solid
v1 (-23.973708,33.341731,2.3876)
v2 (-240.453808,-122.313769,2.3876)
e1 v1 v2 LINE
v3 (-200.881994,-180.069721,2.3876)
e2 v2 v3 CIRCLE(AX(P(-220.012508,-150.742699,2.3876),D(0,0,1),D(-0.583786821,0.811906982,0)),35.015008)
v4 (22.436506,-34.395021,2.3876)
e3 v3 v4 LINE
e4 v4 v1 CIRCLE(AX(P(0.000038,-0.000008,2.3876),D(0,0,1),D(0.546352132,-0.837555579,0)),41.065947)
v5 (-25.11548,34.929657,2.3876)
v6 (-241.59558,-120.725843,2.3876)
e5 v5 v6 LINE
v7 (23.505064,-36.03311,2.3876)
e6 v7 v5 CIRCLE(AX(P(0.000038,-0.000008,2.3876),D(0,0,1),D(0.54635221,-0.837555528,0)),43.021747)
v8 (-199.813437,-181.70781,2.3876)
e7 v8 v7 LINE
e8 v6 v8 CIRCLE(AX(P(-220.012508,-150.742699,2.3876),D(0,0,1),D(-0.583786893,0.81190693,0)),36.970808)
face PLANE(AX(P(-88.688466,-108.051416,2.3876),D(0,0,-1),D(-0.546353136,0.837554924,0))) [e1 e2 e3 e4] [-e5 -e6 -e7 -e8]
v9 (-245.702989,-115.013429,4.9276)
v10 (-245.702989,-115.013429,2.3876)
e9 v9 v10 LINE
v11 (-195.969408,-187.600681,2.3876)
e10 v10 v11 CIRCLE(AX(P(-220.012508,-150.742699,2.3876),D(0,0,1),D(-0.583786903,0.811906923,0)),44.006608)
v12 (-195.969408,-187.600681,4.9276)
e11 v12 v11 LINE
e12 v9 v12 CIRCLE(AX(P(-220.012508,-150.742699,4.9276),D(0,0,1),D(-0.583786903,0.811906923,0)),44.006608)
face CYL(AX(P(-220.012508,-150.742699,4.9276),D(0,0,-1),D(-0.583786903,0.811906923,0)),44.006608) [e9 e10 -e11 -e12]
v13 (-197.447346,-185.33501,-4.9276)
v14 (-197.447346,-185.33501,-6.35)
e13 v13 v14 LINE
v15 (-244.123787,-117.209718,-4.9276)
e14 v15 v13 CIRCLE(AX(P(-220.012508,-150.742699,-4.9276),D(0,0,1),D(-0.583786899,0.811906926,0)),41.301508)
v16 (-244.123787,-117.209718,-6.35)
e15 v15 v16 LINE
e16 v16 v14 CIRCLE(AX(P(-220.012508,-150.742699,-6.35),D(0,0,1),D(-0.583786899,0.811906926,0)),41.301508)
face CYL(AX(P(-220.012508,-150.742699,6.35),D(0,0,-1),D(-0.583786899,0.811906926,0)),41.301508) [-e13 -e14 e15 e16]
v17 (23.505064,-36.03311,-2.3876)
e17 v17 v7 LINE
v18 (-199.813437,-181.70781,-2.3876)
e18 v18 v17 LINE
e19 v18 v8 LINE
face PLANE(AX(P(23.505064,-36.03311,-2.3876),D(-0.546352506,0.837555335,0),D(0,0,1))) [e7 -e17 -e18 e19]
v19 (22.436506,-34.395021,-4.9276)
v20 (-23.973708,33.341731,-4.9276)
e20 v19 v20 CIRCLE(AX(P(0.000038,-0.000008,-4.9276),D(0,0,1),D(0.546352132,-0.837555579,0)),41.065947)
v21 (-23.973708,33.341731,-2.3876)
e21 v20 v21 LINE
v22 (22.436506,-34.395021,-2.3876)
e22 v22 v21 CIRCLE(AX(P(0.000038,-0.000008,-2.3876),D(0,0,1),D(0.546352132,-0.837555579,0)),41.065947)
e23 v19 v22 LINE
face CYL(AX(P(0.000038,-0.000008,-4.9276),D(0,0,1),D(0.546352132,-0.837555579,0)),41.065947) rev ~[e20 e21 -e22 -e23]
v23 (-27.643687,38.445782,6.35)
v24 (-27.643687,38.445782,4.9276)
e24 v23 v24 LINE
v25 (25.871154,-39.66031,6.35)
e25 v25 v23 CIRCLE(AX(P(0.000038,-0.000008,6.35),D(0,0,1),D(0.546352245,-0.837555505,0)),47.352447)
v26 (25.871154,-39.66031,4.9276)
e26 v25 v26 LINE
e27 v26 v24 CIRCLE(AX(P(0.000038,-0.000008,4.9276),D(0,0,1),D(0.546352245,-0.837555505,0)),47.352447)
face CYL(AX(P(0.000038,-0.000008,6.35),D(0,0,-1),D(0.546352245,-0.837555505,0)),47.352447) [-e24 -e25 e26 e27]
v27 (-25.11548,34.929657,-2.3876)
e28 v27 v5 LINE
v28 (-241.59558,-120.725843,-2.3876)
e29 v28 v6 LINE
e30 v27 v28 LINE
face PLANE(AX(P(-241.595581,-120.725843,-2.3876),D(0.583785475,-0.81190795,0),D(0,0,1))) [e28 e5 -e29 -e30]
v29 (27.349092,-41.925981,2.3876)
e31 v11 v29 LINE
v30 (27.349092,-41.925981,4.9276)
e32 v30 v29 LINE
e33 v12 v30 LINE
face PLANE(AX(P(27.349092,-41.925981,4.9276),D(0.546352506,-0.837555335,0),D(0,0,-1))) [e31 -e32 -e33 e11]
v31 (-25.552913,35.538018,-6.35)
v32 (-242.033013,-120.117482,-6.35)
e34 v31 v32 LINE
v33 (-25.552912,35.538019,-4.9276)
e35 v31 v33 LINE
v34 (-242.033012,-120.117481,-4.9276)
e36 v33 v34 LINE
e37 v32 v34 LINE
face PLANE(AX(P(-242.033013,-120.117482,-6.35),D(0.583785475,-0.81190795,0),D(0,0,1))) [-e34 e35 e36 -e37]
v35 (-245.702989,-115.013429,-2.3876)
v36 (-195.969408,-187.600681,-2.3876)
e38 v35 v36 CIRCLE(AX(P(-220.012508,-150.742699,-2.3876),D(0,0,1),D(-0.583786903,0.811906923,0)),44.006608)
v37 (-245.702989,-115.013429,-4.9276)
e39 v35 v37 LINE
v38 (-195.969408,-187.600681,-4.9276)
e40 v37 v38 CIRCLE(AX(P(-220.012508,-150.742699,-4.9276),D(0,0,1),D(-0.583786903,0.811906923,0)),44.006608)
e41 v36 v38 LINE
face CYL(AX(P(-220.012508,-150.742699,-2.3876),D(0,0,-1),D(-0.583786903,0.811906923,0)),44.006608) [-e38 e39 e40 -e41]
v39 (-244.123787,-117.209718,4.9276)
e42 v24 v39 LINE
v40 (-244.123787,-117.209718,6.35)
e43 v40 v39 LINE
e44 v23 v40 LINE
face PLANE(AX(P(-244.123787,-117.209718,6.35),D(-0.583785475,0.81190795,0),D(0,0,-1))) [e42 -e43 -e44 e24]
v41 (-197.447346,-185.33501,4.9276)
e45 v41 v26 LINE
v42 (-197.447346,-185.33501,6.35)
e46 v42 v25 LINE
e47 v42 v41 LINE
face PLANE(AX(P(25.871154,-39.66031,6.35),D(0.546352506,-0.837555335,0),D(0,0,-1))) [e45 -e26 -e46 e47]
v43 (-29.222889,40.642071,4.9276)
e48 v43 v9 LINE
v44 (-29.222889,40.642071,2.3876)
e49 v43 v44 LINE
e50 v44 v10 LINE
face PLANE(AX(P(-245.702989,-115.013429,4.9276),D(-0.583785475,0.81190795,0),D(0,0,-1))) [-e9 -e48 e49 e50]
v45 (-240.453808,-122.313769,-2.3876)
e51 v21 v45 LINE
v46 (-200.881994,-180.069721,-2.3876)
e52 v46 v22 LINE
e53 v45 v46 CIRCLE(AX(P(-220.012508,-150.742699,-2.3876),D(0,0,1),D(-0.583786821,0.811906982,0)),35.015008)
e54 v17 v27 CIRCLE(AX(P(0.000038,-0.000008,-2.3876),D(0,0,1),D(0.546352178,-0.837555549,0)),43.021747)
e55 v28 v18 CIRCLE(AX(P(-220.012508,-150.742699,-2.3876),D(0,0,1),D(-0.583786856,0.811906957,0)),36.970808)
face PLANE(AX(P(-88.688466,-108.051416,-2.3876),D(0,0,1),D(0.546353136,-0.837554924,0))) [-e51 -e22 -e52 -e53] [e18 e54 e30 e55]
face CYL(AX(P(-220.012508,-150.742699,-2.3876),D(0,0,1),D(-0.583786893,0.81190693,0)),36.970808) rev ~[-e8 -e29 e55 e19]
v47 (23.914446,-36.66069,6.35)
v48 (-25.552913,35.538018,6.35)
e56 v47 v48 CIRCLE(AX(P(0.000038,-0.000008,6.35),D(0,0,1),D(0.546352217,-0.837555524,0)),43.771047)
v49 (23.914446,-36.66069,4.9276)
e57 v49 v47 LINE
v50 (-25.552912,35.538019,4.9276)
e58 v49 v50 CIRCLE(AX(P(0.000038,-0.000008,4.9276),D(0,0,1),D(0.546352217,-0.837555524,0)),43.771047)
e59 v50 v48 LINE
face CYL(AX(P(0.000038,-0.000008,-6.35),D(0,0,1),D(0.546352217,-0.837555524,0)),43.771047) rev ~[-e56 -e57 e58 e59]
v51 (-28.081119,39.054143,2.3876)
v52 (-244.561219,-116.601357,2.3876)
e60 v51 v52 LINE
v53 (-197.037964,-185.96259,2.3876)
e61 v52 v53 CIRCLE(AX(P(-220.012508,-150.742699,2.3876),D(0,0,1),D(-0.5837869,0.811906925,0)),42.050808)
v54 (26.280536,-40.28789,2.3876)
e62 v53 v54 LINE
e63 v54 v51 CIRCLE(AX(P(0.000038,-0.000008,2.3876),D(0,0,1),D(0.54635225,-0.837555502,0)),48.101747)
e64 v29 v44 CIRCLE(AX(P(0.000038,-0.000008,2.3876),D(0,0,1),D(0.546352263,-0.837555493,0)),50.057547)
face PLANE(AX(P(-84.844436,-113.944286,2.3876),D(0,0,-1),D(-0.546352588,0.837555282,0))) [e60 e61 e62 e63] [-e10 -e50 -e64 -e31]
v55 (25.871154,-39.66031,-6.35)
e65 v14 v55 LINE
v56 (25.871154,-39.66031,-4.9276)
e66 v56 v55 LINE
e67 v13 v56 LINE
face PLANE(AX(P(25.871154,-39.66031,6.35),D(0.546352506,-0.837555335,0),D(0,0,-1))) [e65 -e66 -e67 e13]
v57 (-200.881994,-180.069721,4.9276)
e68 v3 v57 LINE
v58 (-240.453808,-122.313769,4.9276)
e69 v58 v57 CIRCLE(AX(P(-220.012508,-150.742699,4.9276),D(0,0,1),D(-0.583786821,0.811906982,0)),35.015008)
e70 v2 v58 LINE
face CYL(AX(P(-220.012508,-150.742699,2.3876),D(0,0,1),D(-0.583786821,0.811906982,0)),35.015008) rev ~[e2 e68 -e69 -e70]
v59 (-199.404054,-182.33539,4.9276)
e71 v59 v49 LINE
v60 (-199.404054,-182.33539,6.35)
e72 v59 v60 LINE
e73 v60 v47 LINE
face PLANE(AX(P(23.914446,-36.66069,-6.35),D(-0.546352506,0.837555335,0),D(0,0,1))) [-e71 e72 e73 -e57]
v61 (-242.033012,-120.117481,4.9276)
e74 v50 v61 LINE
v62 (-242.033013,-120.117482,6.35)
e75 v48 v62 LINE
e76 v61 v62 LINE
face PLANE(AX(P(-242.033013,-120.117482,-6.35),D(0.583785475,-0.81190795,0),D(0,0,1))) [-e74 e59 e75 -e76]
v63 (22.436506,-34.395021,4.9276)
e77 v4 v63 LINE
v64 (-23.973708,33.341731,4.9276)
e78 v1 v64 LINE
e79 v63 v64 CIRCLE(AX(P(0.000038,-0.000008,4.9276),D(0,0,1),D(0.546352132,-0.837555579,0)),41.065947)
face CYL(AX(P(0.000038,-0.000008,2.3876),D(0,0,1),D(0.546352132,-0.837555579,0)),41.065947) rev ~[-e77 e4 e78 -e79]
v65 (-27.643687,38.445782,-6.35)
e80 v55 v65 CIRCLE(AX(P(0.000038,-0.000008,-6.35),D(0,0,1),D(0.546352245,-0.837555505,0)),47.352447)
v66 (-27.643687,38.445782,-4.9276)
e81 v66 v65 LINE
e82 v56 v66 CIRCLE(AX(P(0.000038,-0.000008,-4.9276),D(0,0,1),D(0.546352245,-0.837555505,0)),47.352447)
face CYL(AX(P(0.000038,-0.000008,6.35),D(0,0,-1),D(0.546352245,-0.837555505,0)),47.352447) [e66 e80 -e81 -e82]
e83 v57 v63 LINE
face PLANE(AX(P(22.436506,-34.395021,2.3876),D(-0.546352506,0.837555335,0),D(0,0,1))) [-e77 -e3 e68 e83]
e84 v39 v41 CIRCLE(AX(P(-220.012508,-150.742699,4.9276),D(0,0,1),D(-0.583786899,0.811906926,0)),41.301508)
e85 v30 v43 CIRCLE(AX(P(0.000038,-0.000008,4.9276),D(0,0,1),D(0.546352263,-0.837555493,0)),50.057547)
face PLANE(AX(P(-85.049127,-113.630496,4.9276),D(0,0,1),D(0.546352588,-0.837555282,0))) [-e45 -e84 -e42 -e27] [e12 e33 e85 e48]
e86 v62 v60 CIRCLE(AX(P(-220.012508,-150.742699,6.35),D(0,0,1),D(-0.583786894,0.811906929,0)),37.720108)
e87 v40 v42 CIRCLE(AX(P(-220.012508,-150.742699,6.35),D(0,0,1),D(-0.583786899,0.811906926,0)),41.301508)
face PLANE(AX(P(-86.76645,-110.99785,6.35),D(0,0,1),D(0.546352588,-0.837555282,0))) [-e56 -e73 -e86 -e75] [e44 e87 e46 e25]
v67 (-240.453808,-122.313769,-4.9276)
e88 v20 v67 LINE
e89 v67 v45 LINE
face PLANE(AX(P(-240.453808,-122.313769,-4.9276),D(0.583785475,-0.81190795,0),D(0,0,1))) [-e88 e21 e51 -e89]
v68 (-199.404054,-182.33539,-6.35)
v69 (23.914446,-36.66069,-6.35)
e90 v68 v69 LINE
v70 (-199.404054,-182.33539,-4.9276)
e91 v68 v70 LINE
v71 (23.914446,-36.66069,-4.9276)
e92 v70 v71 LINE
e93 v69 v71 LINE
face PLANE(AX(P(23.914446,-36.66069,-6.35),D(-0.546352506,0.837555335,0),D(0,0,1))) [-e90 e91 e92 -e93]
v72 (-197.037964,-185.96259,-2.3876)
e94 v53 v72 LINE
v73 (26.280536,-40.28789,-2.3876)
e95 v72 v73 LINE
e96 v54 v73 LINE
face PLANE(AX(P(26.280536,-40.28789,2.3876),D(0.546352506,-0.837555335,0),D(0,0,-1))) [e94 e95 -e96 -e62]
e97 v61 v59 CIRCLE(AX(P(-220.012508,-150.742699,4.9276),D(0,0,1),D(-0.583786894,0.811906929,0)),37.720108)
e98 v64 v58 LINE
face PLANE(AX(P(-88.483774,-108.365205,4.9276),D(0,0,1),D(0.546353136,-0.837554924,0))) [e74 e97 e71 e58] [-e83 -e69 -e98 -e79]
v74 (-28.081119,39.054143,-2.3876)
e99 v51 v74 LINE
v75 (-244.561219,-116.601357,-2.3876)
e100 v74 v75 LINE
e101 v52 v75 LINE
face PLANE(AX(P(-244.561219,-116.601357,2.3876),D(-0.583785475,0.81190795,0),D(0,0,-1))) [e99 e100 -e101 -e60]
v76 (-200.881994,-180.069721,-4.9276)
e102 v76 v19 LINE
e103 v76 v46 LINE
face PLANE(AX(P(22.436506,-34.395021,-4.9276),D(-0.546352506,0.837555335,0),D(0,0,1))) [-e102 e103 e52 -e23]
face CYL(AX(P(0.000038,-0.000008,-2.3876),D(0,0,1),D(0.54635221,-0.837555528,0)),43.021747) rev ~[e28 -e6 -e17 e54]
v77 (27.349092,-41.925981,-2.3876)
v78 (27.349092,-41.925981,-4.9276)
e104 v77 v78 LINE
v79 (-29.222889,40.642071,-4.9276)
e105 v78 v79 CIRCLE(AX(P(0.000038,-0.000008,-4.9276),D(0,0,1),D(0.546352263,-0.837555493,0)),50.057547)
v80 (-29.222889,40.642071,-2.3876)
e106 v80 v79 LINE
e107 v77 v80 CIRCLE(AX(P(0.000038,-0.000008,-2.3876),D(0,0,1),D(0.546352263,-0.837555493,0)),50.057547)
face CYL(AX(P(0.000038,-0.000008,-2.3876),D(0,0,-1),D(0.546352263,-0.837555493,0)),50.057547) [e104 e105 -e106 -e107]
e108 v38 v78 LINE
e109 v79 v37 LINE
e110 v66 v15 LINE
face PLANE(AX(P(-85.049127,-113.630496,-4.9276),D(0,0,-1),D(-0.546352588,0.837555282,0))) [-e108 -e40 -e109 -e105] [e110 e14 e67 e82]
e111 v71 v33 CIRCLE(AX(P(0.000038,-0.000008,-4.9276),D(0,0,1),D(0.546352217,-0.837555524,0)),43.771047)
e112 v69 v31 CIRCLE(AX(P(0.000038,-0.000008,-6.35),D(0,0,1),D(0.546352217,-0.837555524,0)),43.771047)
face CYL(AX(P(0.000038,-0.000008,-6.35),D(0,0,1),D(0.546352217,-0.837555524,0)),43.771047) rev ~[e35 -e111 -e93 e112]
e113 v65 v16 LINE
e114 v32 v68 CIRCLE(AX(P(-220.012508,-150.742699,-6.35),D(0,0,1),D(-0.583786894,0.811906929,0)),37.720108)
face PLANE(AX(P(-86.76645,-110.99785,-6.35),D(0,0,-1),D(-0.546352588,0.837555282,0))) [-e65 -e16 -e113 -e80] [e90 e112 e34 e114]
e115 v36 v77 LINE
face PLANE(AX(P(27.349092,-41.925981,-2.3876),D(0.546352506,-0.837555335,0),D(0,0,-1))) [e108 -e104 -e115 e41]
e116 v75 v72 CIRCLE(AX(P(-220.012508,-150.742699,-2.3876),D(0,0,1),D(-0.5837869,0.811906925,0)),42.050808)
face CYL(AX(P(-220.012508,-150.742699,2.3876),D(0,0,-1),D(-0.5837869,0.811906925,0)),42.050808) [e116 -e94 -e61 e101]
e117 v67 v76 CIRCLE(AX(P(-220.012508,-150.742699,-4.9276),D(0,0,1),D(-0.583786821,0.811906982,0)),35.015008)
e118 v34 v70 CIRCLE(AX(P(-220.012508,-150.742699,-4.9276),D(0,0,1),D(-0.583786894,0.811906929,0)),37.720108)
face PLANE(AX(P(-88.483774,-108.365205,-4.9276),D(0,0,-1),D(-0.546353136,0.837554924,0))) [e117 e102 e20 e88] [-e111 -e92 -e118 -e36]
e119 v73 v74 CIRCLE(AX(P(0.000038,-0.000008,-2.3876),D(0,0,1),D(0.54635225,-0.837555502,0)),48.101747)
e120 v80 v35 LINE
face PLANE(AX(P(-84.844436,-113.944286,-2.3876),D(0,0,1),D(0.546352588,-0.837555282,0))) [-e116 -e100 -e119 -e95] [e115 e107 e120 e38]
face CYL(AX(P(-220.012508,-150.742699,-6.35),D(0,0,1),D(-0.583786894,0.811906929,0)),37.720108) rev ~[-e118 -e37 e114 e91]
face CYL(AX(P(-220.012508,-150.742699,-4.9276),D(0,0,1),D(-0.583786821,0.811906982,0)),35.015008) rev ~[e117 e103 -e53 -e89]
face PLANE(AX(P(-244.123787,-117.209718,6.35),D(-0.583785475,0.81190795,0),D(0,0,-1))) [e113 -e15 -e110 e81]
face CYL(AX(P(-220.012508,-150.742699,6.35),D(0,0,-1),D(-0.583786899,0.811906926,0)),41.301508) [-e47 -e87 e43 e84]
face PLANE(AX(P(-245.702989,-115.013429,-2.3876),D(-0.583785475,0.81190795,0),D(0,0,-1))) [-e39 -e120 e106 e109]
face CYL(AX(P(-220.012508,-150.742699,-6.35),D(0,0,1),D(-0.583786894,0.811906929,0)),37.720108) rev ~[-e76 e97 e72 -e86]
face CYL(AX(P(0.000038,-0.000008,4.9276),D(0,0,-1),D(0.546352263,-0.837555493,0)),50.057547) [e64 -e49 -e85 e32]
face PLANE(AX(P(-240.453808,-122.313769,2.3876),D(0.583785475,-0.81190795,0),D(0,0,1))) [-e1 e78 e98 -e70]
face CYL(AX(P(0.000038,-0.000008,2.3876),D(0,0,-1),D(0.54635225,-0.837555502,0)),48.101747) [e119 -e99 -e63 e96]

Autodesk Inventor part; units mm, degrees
ref_plane "Work Plane2" through (-220.0125, -150.7427, 0) normal (-1, 0, 0) x (0, 0, 1)
ref_plane "Work Plane3" through (0, 0, 0) normal (-0.8772708, -0.4799957, 0) x (0, 0, 1)
sketch "Path" plane through (0, 0, 0) normal (0, 0, 1) x (1, 0, 0)
  arc A0 (-243.0784, -118.6636) -> (-198.4257, -183.8352) centre (-220.0125, -150.7427) ccw
  arc A1 (24.8928, -38.1605) -> (-26.5983, 36.9919) centre (0, 0) ccw
  line L0 (24.8928, -38.1605) -> (-198.4257, -183.8352)
  line L1 (-243.0784, -118.6636) -> (-26.5983, 36.9919)
  dimension "d31" = 8.9916
ref_plane "Section Plane" through (-198.4257, -183.8352, 0) normal (0.8375553, 0.5463526, 0) x (0, 0, 1)
sketch "Section Sketch" plane through (-198.4257, -183.8352, 0) normal (0.8375553, 0.5463526, 0) x (0, 0, 1)
  line L0 (-6.35, -1.7907) -> (6.35, -1.7907)
  line L1 (6.35, -1.7907) -> (6.35, 1.7907)
  line L2 (6.35, 1.7907) -> (-6.35, 1.7907)
  line L3 (-6.35, 1.7907) -> (-6.35, -1.7907)
  line L4 (-2.3876, -2.54) -> (2.3876, -2.54)
  line L5 (2.3876, -2.54) -> (2.3876, 2.54)
  line L6 (2.3876, 2.54) -> (-2.3876, 2.54)
  line L7 (-2.3876, 2.54) -> (-2.3876, -2.54)
  line L8 (-2.3876, 0) -> (2.3876, 0) construction
  line L9 (-4.9276, -4.4958) -> (-2.3876, -4.4958)
  line L10 (-2.3876, -4.4958) -> (-2.3876, 4.4958)
  line L11 (-2.3876, 4.4958) -> (-4.9276, 4.4958)
  line L12 (-4.9276, 4.4958) -> (-4.9276, -4.4958)
  line L13 (2.3876, -4.4958) -> (4.9276, -4.4958)
  line L14 (4.9276, -4.4958) -> (4.9276, 4.4958)
  line L15 (4.9276, 4.4958) -> (2.3876, 4.4958)
  line L16 (2.3876, 4.4958) -> (2.3876, -4.4958)
  line L17 (-6.35, 0) -> (6.35, 0) construction
  point P0 (0, 0)
  point P1 (0, 0)
  dimension "d21" = 3.5814
  dimension "d22" = 5.08
  dimension "d23" = 4.7752
  dimension "d24" = 2.54
  dimension "d31" = 8.9916
  dimension "d32" = 12.7
sweep "Solid" add profiles "Section Sketch" path "Path"
pattern_of_one "Strand Pattern"
equation "\"d21\" = da_d2"
equation "\"d22\" = da_d1"
equation "\"d23\" = da_b1"
equation "\"d24\" = da_t1 + da_t2"
equation "\"d30\" = da_pt"
equation "\"da_p\" = 9.525"
equation "\"da_b1\" = 4.7752"
equation "\"da_h2\" = 8.9916"
equation "\"da_h3\" = 7.7978"
equation "\"da_d1\" = 5.08"
equation "\"da_d2\" = 3.5814"
equation "\"da_pt\" = 10.1346"
equation "\"da_b\" = 12.7"
equation "\"da_t1\" = 1.27"
equation "\"da_t2\" = 1.27"
properties part number "Roller Chain"
